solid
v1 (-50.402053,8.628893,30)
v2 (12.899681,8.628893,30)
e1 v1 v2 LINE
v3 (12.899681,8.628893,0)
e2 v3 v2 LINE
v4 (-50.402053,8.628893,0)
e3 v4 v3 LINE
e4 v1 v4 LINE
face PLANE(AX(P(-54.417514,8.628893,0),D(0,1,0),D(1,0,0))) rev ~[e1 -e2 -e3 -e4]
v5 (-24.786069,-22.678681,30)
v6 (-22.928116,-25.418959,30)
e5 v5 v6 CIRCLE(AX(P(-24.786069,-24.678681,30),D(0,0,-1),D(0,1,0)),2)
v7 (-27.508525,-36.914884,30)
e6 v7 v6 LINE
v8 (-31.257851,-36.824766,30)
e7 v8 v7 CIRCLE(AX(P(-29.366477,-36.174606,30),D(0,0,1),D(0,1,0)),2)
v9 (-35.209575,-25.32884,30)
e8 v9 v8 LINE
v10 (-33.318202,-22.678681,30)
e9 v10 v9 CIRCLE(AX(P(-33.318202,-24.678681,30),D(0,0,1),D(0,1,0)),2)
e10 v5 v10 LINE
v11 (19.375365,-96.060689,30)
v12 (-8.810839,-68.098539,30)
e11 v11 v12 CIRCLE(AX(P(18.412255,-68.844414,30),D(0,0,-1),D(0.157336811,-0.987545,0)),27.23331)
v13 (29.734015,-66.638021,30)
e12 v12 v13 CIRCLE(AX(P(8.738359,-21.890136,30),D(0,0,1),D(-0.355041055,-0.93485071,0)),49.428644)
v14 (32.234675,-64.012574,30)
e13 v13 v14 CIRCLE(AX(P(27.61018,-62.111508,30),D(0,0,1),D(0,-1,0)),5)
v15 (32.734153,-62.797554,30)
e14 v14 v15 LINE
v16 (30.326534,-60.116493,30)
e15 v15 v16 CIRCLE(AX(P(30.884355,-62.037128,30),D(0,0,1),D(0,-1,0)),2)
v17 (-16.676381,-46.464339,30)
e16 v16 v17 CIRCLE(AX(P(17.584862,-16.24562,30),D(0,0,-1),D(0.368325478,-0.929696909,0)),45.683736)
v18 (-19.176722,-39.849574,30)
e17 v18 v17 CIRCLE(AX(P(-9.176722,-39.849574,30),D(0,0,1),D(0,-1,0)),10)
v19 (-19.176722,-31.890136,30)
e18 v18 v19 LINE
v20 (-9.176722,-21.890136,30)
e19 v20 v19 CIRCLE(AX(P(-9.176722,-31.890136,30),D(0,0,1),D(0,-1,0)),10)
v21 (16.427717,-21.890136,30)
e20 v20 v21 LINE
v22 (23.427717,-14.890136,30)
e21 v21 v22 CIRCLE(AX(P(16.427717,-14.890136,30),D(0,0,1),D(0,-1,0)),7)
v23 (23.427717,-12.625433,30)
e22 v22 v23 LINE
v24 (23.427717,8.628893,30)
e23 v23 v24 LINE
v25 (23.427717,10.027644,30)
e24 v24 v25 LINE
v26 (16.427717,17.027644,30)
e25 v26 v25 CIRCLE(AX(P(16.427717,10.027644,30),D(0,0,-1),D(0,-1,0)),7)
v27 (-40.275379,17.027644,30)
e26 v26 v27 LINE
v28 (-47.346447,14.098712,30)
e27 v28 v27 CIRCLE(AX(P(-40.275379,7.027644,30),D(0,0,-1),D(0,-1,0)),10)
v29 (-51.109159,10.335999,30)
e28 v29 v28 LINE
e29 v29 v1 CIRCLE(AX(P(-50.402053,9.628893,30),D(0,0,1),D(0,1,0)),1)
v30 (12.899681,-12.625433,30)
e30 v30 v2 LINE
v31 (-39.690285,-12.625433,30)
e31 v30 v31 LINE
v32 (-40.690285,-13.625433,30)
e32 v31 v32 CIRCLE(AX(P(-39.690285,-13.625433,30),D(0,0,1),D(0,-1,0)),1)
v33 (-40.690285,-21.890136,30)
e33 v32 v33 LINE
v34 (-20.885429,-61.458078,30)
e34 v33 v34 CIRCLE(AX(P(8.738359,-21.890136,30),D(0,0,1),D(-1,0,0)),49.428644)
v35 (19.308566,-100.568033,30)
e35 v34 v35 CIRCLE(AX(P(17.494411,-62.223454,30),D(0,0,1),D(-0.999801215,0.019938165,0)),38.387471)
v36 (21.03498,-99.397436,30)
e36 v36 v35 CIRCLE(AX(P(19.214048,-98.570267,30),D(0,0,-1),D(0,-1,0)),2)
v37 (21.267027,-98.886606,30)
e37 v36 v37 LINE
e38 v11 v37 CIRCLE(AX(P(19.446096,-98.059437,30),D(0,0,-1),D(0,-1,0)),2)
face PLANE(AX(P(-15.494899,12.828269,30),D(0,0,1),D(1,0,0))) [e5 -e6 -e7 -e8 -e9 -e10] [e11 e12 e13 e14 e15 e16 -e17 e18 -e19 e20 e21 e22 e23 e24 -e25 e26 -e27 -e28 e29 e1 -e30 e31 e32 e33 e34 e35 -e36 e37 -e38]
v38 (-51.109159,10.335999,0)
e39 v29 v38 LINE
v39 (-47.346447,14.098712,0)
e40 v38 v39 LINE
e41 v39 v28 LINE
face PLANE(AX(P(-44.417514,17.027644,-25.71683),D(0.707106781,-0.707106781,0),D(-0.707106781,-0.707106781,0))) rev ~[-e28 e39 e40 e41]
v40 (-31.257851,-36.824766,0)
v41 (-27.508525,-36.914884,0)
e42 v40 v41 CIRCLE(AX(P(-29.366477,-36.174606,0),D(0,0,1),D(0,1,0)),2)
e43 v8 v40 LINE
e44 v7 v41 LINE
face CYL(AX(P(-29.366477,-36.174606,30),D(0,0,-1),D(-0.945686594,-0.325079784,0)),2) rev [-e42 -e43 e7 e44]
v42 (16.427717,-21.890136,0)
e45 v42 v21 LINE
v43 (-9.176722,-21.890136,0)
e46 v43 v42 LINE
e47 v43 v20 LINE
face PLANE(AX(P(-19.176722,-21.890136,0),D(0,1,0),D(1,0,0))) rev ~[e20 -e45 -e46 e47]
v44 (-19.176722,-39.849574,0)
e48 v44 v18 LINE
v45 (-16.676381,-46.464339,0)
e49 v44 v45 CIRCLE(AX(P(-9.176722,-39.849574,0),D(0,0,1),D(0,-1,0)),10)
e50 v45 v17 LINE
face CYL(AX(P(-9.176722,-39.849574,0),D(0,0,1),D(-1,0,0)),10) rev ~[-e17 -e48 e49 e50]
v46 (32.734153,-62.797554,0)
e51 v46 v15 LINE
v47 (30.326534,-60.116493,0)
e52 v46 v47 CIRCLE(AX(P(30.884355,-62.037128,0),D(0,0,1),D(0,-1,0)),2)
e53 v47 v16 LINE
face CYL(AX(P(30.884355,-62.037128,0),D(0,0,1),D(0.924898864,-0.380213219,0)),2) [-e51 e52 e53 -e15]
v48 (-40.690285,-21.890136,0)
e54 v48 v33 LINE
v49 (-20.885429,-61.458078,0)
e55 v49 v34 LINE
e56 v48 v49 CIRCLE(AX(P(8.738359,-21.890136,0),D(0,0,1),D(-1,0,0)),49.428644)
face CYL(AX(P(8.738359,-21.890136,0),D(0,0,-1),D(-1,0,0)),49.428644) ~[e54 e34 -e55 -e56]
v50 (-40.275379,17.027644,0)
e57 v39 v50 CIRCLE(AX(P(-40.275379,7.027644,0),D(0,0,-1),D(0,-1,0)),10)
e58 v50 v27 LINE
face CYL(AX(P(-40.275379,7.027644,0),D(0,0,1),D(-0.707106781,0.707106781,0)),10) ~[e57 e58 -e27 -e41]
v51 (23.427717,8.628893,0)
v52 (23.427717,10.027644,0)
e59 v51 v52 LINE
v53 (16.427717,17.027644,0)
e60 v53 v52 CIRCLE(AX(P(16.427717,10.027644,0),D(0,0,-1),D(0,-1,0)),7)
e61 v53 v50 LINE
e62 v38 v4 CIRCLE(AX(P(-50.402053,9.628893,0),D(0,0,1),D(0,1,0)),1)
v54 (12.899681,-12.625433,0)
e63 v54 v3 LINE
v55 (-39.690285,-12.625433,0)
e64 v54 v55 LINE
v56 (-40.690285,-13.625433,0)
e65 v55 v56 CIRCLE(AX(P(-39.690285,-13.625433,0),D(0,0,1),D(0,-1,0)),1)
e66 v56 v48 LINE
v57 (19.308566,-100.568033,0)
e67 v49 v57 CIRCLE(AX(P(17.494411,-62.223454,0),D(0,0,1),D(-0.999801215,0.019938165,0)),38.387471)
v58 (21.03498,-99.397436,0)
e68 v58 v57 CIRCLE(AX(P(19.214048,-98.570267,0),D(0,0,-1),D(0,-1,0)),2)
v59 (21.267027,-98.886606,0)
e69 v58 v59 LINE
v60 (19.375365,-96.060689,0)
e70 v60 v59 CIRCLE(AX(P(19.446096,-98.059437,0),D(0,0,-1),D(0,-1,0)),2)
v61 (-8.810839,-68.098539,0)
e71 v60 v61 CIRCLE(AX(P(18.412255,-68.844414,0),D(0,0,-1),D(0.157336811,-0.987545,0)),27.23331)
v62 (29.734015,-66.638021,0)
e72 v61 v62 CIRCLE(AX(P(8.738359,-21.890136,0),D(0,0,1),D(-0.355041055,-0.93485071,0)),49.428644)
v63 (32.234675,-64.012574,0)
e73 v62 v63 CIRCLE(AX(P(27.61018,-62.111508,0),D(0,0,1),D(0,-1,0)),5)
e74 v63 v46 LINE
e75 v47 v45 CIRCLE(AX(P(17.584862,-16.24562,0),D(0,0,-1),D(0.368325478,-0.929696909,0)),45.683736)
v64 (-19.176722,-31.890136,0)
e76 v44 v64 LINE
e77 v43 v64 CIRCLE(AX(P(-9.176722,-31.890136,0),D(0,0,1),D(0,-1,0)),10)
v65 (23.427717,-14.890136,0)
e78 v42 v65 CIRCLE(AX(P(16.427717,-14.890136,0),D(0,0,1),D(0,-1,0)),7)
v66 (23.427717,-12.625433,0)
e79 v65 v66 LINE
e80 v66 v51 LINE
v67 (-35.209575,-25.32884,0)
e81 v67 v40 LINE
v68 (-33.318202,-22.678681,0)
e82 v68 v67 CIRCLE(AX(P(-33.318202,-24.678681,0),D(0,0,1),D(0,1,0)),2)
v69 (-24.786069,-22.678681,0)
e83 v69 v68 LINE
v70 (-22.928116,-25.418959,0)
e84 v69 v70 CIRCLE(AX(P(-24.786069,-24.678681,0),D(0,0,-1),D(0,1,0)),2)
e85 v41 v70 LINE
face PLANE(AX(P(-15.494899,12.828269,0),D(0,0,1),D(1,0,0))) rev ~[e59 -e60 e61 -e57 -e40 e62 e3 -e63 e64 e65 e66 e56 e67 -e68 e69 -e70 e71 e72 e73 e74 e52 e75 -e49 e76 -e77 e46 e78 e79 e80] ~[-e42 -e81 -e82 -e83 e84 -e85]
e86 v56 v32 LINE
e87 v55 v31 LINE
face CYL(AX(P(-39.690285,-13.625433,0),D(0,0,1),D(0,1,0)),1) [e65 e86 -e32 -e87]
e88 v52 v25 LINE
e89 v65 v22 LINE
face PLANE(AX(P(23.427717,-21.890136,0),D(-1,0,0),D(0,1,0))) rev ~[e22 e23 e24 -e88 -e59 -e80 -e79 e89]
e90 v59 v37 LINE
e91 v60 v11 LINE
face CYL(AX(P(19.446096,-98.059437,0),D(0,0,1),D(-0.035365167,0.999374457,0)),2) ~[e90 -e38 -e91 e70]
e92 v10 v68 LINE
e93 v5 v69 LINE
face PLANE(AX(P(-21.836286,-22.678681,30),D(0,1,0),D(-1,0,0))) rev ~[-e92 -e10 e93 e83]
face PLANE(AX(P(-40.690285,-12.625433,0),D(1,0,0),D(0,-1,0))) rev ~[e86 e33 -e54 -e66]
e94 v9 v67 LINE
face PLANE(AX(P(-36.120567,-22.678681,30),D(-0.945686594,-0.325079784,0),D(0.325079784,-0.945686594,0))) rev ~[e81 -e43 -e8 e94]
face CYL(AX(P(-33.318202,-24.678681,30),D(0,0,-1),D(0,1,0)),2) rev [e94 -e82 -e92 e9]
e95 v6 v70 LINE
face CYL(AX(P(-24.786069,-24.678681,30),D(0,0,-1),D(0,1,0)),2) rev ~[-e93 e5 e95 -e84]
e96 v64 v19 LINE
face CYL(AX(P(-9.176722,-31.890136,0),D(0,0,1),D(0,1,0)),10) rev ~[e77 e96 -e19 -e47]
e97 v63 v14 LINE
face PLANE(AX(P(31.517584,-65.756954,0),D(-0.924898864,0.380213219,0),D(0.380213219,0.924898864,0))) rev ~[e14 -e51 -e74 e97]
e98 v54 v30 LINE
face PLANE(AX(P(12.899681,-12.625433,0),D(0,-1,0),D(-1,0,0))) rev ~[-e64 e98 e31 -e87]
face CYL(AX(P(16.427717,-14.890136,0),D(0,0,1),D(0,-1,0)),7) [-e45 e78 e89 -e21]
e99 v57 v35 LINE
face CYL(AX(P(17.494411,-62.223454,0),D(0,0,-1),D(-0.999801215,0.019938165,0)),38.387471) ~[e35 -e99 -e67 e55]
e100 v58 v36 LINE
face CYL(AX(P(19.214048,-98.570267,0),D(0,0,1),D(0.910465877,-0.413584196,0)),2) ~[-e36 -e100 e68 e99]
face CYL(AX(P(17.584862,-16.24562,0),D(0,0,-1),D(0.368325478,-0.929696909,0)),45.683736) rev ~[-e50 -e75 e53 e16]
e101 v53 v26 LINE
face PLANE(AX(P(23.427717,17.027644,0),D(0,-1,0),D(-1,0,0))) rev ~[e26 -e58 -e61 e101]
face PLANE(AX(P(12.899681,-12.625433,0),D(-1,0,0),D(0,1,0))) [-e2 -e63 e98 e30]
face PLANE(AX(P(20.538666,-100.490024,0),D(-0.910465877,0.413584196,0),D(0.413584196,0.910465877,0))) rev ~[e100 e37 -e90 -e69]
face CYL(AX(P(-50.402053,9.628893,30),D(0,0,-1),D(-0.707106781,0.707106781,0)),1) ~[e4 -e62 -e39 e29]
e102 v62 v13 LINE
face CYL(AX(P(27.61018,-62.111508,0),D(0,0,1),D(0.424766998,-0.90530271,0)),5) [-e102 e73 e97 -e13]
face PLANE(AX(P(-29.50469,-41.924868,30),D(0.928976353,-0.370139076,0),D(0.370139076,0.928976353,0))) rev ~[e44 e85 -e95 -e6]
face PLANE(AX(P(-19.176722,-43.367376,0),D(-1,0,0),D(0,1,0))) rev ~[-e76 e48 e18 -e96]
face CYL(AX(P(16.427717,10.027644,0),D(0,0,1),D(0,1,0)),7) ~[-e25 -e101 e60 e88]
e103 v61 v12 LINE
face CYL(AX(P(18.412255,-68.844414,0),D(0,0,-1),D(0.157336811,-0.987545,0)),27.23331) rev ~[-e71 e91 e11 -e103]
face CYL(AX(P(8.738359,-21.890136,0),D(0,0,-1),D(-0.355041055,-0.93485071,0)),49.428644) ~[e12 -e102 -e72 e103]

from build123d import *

# Parameters (mm, degrees)
F0_W        = 10.5280357461
F0_H        = 21.2543252856
F1_DEPTH    = 30
F2_R        = 5
F3_R        = 2
F4_R        = 2
F5_R        = 2
F6_R        = 7
F7_T1_DEPTH = 81.4336597593
F8_R        = 10
F9_R        = 1
F10_R       = 10
F11_R       = 10
F13_DEPTH   = 30
F14_R       = 2


# Not quite as in the source:
# - a fillet or chamfer that OpenCascade refuses, or shapes differently, is made with other operations: its cross-section is extruded or revolved along the edge and cut away or added


with BuildPart() as f1:
    # F0 (on Top) → F1 (new body)
    with BuildSketch(Plane.XY):
        Polygon((23.4277165425, 17.0276444405), (-54.4175144403, 17.0276444405), (-54.4175144403, 8.6288927123), (12.8996807964, 8.6288927123), (23.4277165425, 8.6288927123), align=None)
        with Locations((18.1636986695, -1.9982699305)):
            Rectangle(F0_W, F0_H)
        Polygon((23.4277165425, -21.8901360014), (23.4277165425, -12.6254325733), (12.8996807964, -12.6254325733), (-40.6902853517, -12.6254325733), (-40.6902853517, -21.8901360014), (-27.7488247443, -21.8901360014), (-19.1767220313, -21.8901360014), align=None)
        with BuildLine():
            Line((-19.1767220313, -43.3673763092), (-19.1767220313, -21.8901360014))
            Line((-19.1767220313, -21.8901360014), (-27.7488247443, -21.8901360014))
            ThreePointArc((-27.7488247443, -21.8901360014), (-24.844212154, -33.1801228498), (-19.1767220313, -43.3673763092))
        make_face()
        with BuildLine():
            Line((-27.7488247443, -21.8901360014), (-40.6902853517, -21.8901360014))
            ThreePointArc((-40.6902853517, -21.8901360014), (-35.4626283769, -44.0139601174), (-20.8854291365, -61.4580781309))
            ThreePointArc((-20.8854291365, -61.4580781309), (-15.0806794225, -65.2011539101), (-8.8108392586, -68.098538912))
            ThreePointArc((-8.8108392586, -68.098538912), (11.6035028188, -71.235670703), (31.5175838768, -65.7569542527))
            Line((31.5175838768, -65.7569542527), (34.4113459094, -58.7176481952))
            ThreePointArc((34.4113459094, -58.7176481952), (5.0047282318, -60.1630877212), (-19.1767220313, -43.3673763092))
            ThreePointArc((-19.1767220313, -43.3673763092), (-24.844212154, -33.1801228498), (-27.7488247443, -21.8901360014))
        make_face()
        with BuildLine():
            ThreePointArc((-8.8108392586, -68.098538912), (-15.0806794225, -65.2011539101), (-20.8854291365, -61.4580781309))
            ThreePointArc((-20.8854291365, -61.4580781309), (-8.8309401238, -90.1622048174), (20.5386656224, -100.4900241667))
            Line((20.5386656224, -100.4900241667), (22.6970568086, -95.7385333169))
            ThreePointArc((22.6970568086, -95.7385333169), (0.4530333538, -89.3168234963), (-8.8108392586, -68.098538912))
        make_face()
    extrude(amount=F1_DEPTH)

    # F2
    f2_edges = [f1.edges().sort_by_distance(p)[0] for p in [
        (31.517584, -65.756954, 15),
    ]]
    fillet(f2_edges, radius=F2_R)

    # F3
    f3_edges = [f1.edges().sort_by_distance(p)[0] for p in [
        (34.411346, -58.717648, 15),
    ]]
    fillet(f3_edges, radius=F3_R)

    # F4
    f4_edges = [f1.edges().sort_by_distance(p)[0] for p in [
        (22.697057, -95.738533, 15),
    ]]
    fillet(f4_edges, radius=F4_R)

    # F5
    f5_edges = [f1.edges().sort_by_distance(p)[0] for p in [
        (20.538666, -100.490024, 15),
    ]]
    fillet(f5_edges, radius=F5_R)

    # F6
    f6_edges = [f1.edges().sort_by_distance(p)[0] for p in [
        (23.427717, -21.890136, 15),
        (23.427717, 17.027644, 15),
    ]]
    fillet(f6_edges, radius=F6_R)

    # F7: chamfer of 10 on 1 edges, made by hand

    # F7_s2 → F7_t1 (cut)
    with BuildSketch(Plane.XY.offset(-25.7168298797)):
        Polygon((-44.4175144403, 17.0276444405), (-54.4175144403, 7.0276444405), (-54.4175144403, 17.0276444405), align=None)
    extrude(amount=F7_T1_DEPTH, mode=Mode.SUBTRACT)

    # F8
    f8_edges = [f1.edges().sort_by_distance(p)[0] for p in [
        (-44.417514, 17.027644, 15),
    ]]
    fillet(f8_edges, radius=F8_R)

    # F9
    f9_edges = [f1.edges().sort_by_distance(p)[0] for p in [
        (-52.816266, 8.628893, 15),
        (-40.690285, -12.625433, 15),
    ]]
    fillet(f9_edges, radius=F9_R)

    # F10
    f10_edges = [f1.edges().sort_by_distance(p)[0] for p in [
        (-19.176722, -21.890136, 15),
    ]]
    fillet(f10_edges, radius=F10_R)

    # F11
    f11_edges = [f1.edges().sort_by_distance(p)[0] for p in [
        (-19.176722, -43.367376, 15),
    ]]
    fillet(f11_edges, radius=F11_R)

    # F12 (on face) → F13 (cut)
    with BuildSketch(Plane.XY.offset(30)):
        Polygon((-21.8362864107, -22.6786807179), (-36.1205674708, -22.6786807179), (-29.5046903193, -41.924867779), align=None)
    extrude(amount=-F13_DEPTH, mode=Mode.SUBTRACT)

    # F14
    f14_edges = [f1.edges().sort_by_distance(p)[0] for p in [
        (-21.836286, -22.678681, 15),
        (-36.120567, -22.678681, 15),
        (-29.50469, -41.924868, 15),
    ]]
    fillet(f14_edges, radius=F14_R)


solid = f1.part
